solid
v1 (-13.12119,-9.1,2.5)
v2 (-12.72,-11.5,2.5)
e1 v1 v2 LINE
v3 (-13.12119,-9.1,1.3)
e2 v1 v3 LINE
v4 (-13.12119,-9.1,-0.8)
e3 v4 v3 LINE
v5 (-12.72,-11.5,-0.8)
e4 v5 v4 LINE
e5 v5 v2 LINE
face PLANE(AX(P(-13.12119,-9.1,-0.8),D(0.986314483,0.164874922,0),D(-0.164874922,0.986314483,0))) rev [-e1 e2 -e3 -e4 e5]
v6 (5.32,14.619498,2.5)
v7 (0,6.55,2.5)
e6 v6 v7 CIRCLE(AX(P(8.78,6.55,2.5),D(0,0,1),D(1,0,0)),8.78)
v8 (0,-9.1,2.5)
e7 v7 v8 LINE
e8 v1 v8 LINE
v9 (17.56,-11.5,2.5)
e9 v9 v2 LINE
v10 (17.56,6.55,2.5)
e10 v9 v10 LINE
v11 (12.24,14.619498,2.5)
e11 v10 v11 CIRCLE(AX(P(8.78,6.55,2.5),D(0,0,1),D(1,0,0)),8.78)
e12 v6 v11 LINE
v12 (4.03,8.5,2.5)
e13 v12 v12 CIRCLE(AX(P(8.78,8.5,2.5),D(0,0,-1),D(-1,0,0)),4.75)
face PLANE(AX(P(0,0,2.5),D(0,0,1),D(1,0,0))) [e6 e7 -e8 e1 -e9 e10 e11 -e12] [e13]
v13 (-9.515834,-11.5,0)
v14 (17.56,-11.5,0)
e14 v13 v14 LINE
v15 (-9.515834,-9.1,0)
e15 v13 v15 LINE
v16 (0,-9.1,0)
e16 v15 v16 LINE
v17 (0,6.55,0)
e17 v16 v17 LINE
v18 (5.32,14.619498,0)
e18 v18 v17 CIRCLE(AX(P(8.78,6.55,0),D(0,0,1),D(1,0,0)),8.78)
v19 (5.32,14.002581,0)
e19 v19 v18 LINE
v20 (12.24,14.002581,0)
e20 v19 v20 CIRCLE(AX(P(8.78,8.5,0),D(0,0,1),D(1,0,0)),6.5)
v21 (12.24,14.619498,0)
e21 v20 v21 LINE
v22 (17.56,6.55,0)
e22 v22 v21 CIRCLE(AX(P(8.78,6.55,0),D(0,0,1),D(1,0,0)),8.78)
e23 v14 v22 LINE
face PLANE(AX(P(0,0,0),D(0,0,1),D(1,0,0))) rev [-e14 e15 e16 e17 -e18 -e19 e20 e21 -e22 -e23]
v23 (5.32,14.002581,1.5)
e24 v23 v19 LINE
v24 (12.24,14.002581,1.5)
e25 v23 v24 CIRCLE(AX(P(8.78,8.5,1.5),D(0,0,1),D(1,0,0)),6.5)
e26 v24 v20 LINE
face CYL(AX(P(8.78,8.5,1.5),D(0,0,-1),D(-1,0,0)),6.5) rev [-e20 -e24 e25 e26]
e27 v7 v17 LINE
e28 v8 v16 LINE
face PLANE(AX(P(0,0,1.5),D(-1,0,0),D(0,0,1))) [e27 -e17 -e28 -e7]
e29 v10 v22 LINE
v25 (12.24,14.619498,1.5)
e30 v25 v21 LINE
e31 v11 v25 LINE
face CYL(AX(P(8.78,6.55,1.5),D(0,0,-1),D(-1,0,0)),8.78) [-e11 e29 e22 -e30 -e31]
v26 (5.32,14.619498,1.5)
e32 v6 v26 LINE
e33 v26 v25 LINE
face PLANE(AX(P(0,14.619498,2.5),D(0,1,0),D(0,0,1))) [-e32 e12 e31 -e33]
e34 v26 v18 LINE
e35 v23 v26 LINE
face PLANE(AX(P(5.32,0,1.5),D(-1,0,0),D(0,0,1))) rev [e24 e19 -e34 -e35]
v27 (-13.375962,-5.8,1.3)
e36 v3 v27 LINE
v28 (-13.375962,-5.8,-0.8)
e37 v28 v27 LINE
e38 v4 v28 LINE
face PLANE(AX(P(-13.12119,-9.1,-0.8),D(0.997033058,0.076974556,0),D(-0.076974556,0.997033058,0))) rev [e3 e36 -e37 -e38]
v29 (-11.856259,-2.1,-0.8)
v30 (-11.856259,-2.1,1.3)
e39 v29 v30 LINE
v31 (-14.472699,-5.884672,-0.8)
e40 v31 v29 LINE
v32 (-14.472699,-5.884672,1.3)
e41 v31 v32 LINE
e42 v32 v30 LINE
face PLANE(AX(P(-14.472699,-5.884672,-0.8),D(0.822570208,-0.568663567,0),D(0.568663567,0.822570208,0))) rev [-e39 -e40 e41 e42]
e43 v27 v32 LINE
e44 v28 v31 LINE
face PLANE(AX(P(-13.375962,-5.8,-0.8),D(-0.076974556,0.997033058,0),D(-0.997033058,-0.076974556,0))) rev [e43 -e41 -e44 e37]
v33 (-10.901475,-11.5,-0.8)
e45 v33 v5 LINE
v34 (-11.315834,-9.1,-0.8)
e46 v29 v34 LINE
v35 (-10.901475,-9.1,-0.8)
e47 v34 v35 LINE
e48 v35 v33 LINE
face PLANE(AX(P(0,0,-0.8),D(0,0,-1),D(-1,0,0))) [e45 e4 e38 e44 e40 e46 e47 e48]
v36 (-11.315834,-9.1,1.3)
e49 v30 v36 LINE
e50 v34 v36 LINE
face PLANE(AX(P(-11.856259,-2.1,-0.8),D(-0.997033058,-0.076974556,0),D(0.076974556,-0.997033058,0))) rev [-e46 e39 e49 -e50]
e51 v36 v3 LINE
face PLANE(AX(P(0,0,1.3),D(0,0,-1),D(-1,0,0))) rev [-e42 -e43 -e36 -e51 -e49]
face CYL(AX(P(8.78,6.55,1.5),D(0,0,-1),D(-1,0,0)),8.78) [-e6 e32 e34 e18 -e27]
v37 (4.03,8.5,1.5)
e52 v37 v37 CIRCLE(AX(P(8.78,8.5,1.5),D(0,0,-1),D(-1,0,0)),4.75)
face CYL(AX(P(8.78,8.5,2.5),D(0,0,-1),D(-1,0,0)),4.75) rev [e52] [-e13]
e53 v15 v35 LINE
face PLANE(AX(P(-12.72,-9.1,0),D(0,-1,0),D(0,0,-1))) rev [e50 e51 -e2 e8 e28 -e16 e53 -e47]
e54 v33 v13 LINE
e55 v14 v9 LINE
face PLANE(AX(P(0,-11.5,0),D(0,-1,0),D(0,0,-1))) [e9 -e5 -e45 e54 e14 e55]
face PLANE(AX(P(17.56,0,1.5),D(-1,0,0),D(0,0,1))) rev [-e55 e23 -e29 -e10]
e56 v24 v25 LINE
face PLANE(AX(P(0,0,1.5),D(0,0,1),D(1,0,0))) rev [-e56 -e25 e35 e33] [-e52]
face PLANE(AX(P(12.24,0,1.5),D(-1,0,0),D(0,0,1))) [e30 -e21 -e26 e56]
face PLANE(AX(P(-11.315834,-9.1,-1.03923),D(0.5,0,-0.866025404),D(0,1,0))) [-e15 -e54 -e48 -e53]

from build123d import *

# Parameters (mm, degrees)
BOSS_EXTRUDE1_DEPTH      = 1.5
BOSS_EXTRUDE2_DEPTH      = 1
SKETCH4_R                = 4.75
CUT_EXTRUDE1_DEPTH       = 23.898325822
SKETCH5_W                = 17.56
SKETCH5_H                = 2.5
BOSS_EXTRUDE3_DEPTH      = 0.15
SKETCH6_W                = 17.56
SKETCH6_H                = 2.5
BOSS_EXTRUDE4_DEPTH      = 11.35
SKETCH7_W                = 2.5
SKETCH7_H                = 2.4
BOSS_EXTRUDE5_DEPTH      = 12.72
BOSS_EXTRUDE6_DEPTH      = 0.8
BOSS_EXTRUDE6_DEPTH_BACK = 1.3
SKETCH9_W                = 1.40416608
SKETCH9_H                = 2.4
BOSS_EXTRUDE7_DEPTH      = 0.8
CHAMFER3_SIZE            = 1.039230485
CHAMFER3_SIZE_2          = 1.8
BOSS_EXTRUDE8_DEPTH      = 1.2


with BuildPart() as part:
    # Sketch1 → Boss-Extrude1 (new body)
    with BuildSketch(Plane.XY):
        with BuildLine():
            ThreePointArc((14.980604809, 6.55), (8.78, 2), (2.579395191, 6.55))
            Line((2.579395191, 6.55), (0, 6.55))
            Line((0, 6.55), (0, 0))
            Line((0, 0), (17.56, 0))
            Line((17.56, 0), (17.56, 6.55))
            Line((17.56, 6.55), (14.980604809, 6.55))
        make_face()
        with BuildLine():
            ThreePointArc((2.579395191, 6.55), (2.679421093, 10.743420825), (5.32, 14.002581212))
            Line((5.32, 14.002581212), (5.32, 14.619498126))
            ThreePointArc((5.32, 14.619498126), (1.449679407, 11.382680416), (0, 6.55))
            Line((0, 6.55), (2.579395191, 6.55))
        make_face()
        with BuildLine():
            ThreePointArc((12.24, 14.002581212), (14.880578907, 10.743420825), (14.980604809, 6.55))
            Line((14.980604809, 6.55), (17.56, 6.55))
            ThreePointArc((17.56, 6.55), (16.110320593, 11.382680416), (12.24, 14.619498126))
            Line((12.24, 14.619498126), (12.24, 14.002581212))
        make_face()
    extrude(amount=BOSS_EXTRUDE1_DEPTH)

    # Sketch3 → Boss-Extrude2 (add)
    with BuildSketch(Plane.XY.offset(1.5)):
        with BuildLine():
            Line((12.24, 14.619498126), (12.24, 14.002581212))
            ThreePointArc((12.24, 14.002581212), (8.78, 2), (5.32, 14.002581212))
            Line((5.32, 14.002581212), (5.32, 14.619498126))
            ThreePointArc((5.32, 14.619498126), (1.449679407, 11.382680416), (0, 6.55))
            Line((0, 6.55), (0, 0))
            Line((0, 0), (17.56, 0))
            Line((17.56, 0), (17.56, 6.55))
            ThreePointArc((17.56, 6.55), (16.110320593, 11.382680416), (12.24, 14.619498126))
        make_face()
        with BuildLine():
            Line((5.32, 14.619498126), (12.24, 14.619498126))
            Line((12.24, 14.619498126), (12.24, 14.002581212))
            ThreePointArc((12.24, 14.002581212), (8.78, 2), (5.32, 14.002581212))
            Line((5.32, 14.002581212), (5.32, 14.619498126))
        make_face()
    extrude(amount=BOSS_EXTRUDE2_DEPTH)

    # Sketch4 → Cut-Extrude1 (cut, through all)
    with BuildSketch(Plane(origin=(0, 0, 1.5), x_dir=(-1, 0, 0), z_dir=(0, 0, -1))):
        with Locations((-8.78, 8.5)):
            Circle(SKETCH4_R)
    extrude(amount=-CUT_EXTRUDE1_DEPTH, mode=Mode.SUBTRACT)

    # Sketch5 → Boss-Extrude3 (add)
    with BuildSketch(Plane.XZ):
        with Locations((8.78, 1.25)):
            Rectangle(SKETCH5_W, SKETCH5_H)
    extrude(amount=BOSS_EXTRUDE3_DEPTH)

    # Sketch6 → Boss-Extrude4 (add)
    with BuildSketch(Plane.XZ.offset(0.15)):
        with Locations((8.78, 1.25)):
            Rectangle(SKETCH6_W, SKETCH6_H)
    extrude(amount=BOSS_EXTRUDE4_DEPTH)

    # Sketch7 → Boss-Extrude5 (add)
    with BuildSketch(Plane.ZY):
        with Locations((1.25, -10.3)):
            Rectangle(SKETCH7_W, SKETCH7_H)
    extrude(amount=BOSS_EXTRUDE5_DEPTH)

    # Sketch8 → Boss-Extrude6 (add, two sides: drawn at the far end of the back side and taken through both)
    with BuildSketch(Plane(origin=(0, 0, 0), x_dir=(-1, 0, 0), z_dir=(0, 0, -1)).offset(-BOSS_EXTRUDE6_DEPTH_BACK)):
        Polygon((13.121190309, -9.1), (13.375962235, -5.8), (14.472698599, -5.884672011), (11.85625922, -2.1), (11.31583392, -9.1), (12.72, -9.1), (12.72, -11.5), align=None)
    extrude(amount=BOSS_EXTRUDE6_DEPTH + BOSS_EXTRUDE6_DEPTH_BACK)

    # Sketch9 → Boss-Extrude7 (add)
    with BuildSketch(Plane(origin=(0, 0, 0), x_dir=(-1, 0, 0), z_dir=(0, 0, -1))):
        with Locations((12.01791696, -10.3)):
            Rectangle(SKETCH9_W, SKETCH9_H)
    extrude(amount=BOSS_EXTRUDE7_DEPTH)

    # Chamfer3
    # the kernel refuses this chamfer: 1.8, 1.039230485 mm, written as the material it adds along each edge
    with BuildSketch(Plane(origin=(-11.31583392, -11.5, 0), x_dir=(-0.05789386240267112, 0, -0.9983227437537925), z_dir=(0, 1, 0))) as chamfer3_piece_1_section:
        Polygon((CHAMFER3_SIZE * 0.998322743313, -CHAMFER3_SIZE * 0.0578938623771), (-CHAMFER3_SIZE_2 * 0.0578938624027, -CHAMFER3_SIZE_2 * 0.998322743754), (0, 0), align=None)
    chamfer3_piece_1 = extrude(amount=2.4, mode=Mode.PRIVATE)
    chamfer3_piece_1 = split(chamfer3_piece_1, bisect_by=Plane(origin=(-11.20125383, -10.584128582, -0.396089169), z_dir=(-0.9970330575262718, -0.07697455553502185, 0)), keep=Keep.TOP, mode=Mode.PRIVATE)
    chamfer3_piece_1 = split(chamfer3_piece_1, bisect_by=Plane(origin=(-11.276211274, -10.589915567, -0.8), z_dir=(0, 0, 1)), keep=Keep.TOP, mode=Mode.PRIVATE)
    add(chamfer3_piece_1)
    with BuildSketch(Plane(origin=(-11.31583392, -11.5, 0), x_dir=(-0.05789386240267112, 0, -0.9983227437537925), z_dir=(0, 1, 0))) as chamfer3_piece_2_section:
        Polygon((CHAMFER3_SIZE * 0.998322743313, -CHAMFER3_SIZE * 0.0578938623771), (-CHAMFER3_SIZE_2 * 0.0578938624027, -CHAMFER3_SIZE_2 * 0.998322743754), (0, 0), align=None)
    chamfer3_piece_2 = extrude(amount=2.4, mode=Mode.PRIVATE)
    chamfer3_piece_2 = split(chamfer3_piece_2, bisect_by=Plane(origin=(-11.222198101, -10.312842427, -0.281258227), z_dir=(0.9970330575262718, 0.07697455553502185, 0)), keep=Keep.TOP, mode=Mode.PRIVATE)
    chamfer3_piece_2 = split(chamfer3_piece_2, bisect_by=Plane(origin=(-10.603533265, -10.265079266, -0.8), z_dir=(0, 0, 1)), keep=Keep.TOP, mode=Mode.PRIVATE)
    add(chamfer3_piece_2)

    # Sketch10 → Boss-Extrude8 (add)
    with BuildSketch(Plane.XY.offset(1.3)):
        Polygon((-12.72, -11.5), (-12.72, -9.1), (-13.121190309, -9.1), align=None)
    extrude(amount=BOSS_EXTRUDE8_DEPTH)


solid = part.part
